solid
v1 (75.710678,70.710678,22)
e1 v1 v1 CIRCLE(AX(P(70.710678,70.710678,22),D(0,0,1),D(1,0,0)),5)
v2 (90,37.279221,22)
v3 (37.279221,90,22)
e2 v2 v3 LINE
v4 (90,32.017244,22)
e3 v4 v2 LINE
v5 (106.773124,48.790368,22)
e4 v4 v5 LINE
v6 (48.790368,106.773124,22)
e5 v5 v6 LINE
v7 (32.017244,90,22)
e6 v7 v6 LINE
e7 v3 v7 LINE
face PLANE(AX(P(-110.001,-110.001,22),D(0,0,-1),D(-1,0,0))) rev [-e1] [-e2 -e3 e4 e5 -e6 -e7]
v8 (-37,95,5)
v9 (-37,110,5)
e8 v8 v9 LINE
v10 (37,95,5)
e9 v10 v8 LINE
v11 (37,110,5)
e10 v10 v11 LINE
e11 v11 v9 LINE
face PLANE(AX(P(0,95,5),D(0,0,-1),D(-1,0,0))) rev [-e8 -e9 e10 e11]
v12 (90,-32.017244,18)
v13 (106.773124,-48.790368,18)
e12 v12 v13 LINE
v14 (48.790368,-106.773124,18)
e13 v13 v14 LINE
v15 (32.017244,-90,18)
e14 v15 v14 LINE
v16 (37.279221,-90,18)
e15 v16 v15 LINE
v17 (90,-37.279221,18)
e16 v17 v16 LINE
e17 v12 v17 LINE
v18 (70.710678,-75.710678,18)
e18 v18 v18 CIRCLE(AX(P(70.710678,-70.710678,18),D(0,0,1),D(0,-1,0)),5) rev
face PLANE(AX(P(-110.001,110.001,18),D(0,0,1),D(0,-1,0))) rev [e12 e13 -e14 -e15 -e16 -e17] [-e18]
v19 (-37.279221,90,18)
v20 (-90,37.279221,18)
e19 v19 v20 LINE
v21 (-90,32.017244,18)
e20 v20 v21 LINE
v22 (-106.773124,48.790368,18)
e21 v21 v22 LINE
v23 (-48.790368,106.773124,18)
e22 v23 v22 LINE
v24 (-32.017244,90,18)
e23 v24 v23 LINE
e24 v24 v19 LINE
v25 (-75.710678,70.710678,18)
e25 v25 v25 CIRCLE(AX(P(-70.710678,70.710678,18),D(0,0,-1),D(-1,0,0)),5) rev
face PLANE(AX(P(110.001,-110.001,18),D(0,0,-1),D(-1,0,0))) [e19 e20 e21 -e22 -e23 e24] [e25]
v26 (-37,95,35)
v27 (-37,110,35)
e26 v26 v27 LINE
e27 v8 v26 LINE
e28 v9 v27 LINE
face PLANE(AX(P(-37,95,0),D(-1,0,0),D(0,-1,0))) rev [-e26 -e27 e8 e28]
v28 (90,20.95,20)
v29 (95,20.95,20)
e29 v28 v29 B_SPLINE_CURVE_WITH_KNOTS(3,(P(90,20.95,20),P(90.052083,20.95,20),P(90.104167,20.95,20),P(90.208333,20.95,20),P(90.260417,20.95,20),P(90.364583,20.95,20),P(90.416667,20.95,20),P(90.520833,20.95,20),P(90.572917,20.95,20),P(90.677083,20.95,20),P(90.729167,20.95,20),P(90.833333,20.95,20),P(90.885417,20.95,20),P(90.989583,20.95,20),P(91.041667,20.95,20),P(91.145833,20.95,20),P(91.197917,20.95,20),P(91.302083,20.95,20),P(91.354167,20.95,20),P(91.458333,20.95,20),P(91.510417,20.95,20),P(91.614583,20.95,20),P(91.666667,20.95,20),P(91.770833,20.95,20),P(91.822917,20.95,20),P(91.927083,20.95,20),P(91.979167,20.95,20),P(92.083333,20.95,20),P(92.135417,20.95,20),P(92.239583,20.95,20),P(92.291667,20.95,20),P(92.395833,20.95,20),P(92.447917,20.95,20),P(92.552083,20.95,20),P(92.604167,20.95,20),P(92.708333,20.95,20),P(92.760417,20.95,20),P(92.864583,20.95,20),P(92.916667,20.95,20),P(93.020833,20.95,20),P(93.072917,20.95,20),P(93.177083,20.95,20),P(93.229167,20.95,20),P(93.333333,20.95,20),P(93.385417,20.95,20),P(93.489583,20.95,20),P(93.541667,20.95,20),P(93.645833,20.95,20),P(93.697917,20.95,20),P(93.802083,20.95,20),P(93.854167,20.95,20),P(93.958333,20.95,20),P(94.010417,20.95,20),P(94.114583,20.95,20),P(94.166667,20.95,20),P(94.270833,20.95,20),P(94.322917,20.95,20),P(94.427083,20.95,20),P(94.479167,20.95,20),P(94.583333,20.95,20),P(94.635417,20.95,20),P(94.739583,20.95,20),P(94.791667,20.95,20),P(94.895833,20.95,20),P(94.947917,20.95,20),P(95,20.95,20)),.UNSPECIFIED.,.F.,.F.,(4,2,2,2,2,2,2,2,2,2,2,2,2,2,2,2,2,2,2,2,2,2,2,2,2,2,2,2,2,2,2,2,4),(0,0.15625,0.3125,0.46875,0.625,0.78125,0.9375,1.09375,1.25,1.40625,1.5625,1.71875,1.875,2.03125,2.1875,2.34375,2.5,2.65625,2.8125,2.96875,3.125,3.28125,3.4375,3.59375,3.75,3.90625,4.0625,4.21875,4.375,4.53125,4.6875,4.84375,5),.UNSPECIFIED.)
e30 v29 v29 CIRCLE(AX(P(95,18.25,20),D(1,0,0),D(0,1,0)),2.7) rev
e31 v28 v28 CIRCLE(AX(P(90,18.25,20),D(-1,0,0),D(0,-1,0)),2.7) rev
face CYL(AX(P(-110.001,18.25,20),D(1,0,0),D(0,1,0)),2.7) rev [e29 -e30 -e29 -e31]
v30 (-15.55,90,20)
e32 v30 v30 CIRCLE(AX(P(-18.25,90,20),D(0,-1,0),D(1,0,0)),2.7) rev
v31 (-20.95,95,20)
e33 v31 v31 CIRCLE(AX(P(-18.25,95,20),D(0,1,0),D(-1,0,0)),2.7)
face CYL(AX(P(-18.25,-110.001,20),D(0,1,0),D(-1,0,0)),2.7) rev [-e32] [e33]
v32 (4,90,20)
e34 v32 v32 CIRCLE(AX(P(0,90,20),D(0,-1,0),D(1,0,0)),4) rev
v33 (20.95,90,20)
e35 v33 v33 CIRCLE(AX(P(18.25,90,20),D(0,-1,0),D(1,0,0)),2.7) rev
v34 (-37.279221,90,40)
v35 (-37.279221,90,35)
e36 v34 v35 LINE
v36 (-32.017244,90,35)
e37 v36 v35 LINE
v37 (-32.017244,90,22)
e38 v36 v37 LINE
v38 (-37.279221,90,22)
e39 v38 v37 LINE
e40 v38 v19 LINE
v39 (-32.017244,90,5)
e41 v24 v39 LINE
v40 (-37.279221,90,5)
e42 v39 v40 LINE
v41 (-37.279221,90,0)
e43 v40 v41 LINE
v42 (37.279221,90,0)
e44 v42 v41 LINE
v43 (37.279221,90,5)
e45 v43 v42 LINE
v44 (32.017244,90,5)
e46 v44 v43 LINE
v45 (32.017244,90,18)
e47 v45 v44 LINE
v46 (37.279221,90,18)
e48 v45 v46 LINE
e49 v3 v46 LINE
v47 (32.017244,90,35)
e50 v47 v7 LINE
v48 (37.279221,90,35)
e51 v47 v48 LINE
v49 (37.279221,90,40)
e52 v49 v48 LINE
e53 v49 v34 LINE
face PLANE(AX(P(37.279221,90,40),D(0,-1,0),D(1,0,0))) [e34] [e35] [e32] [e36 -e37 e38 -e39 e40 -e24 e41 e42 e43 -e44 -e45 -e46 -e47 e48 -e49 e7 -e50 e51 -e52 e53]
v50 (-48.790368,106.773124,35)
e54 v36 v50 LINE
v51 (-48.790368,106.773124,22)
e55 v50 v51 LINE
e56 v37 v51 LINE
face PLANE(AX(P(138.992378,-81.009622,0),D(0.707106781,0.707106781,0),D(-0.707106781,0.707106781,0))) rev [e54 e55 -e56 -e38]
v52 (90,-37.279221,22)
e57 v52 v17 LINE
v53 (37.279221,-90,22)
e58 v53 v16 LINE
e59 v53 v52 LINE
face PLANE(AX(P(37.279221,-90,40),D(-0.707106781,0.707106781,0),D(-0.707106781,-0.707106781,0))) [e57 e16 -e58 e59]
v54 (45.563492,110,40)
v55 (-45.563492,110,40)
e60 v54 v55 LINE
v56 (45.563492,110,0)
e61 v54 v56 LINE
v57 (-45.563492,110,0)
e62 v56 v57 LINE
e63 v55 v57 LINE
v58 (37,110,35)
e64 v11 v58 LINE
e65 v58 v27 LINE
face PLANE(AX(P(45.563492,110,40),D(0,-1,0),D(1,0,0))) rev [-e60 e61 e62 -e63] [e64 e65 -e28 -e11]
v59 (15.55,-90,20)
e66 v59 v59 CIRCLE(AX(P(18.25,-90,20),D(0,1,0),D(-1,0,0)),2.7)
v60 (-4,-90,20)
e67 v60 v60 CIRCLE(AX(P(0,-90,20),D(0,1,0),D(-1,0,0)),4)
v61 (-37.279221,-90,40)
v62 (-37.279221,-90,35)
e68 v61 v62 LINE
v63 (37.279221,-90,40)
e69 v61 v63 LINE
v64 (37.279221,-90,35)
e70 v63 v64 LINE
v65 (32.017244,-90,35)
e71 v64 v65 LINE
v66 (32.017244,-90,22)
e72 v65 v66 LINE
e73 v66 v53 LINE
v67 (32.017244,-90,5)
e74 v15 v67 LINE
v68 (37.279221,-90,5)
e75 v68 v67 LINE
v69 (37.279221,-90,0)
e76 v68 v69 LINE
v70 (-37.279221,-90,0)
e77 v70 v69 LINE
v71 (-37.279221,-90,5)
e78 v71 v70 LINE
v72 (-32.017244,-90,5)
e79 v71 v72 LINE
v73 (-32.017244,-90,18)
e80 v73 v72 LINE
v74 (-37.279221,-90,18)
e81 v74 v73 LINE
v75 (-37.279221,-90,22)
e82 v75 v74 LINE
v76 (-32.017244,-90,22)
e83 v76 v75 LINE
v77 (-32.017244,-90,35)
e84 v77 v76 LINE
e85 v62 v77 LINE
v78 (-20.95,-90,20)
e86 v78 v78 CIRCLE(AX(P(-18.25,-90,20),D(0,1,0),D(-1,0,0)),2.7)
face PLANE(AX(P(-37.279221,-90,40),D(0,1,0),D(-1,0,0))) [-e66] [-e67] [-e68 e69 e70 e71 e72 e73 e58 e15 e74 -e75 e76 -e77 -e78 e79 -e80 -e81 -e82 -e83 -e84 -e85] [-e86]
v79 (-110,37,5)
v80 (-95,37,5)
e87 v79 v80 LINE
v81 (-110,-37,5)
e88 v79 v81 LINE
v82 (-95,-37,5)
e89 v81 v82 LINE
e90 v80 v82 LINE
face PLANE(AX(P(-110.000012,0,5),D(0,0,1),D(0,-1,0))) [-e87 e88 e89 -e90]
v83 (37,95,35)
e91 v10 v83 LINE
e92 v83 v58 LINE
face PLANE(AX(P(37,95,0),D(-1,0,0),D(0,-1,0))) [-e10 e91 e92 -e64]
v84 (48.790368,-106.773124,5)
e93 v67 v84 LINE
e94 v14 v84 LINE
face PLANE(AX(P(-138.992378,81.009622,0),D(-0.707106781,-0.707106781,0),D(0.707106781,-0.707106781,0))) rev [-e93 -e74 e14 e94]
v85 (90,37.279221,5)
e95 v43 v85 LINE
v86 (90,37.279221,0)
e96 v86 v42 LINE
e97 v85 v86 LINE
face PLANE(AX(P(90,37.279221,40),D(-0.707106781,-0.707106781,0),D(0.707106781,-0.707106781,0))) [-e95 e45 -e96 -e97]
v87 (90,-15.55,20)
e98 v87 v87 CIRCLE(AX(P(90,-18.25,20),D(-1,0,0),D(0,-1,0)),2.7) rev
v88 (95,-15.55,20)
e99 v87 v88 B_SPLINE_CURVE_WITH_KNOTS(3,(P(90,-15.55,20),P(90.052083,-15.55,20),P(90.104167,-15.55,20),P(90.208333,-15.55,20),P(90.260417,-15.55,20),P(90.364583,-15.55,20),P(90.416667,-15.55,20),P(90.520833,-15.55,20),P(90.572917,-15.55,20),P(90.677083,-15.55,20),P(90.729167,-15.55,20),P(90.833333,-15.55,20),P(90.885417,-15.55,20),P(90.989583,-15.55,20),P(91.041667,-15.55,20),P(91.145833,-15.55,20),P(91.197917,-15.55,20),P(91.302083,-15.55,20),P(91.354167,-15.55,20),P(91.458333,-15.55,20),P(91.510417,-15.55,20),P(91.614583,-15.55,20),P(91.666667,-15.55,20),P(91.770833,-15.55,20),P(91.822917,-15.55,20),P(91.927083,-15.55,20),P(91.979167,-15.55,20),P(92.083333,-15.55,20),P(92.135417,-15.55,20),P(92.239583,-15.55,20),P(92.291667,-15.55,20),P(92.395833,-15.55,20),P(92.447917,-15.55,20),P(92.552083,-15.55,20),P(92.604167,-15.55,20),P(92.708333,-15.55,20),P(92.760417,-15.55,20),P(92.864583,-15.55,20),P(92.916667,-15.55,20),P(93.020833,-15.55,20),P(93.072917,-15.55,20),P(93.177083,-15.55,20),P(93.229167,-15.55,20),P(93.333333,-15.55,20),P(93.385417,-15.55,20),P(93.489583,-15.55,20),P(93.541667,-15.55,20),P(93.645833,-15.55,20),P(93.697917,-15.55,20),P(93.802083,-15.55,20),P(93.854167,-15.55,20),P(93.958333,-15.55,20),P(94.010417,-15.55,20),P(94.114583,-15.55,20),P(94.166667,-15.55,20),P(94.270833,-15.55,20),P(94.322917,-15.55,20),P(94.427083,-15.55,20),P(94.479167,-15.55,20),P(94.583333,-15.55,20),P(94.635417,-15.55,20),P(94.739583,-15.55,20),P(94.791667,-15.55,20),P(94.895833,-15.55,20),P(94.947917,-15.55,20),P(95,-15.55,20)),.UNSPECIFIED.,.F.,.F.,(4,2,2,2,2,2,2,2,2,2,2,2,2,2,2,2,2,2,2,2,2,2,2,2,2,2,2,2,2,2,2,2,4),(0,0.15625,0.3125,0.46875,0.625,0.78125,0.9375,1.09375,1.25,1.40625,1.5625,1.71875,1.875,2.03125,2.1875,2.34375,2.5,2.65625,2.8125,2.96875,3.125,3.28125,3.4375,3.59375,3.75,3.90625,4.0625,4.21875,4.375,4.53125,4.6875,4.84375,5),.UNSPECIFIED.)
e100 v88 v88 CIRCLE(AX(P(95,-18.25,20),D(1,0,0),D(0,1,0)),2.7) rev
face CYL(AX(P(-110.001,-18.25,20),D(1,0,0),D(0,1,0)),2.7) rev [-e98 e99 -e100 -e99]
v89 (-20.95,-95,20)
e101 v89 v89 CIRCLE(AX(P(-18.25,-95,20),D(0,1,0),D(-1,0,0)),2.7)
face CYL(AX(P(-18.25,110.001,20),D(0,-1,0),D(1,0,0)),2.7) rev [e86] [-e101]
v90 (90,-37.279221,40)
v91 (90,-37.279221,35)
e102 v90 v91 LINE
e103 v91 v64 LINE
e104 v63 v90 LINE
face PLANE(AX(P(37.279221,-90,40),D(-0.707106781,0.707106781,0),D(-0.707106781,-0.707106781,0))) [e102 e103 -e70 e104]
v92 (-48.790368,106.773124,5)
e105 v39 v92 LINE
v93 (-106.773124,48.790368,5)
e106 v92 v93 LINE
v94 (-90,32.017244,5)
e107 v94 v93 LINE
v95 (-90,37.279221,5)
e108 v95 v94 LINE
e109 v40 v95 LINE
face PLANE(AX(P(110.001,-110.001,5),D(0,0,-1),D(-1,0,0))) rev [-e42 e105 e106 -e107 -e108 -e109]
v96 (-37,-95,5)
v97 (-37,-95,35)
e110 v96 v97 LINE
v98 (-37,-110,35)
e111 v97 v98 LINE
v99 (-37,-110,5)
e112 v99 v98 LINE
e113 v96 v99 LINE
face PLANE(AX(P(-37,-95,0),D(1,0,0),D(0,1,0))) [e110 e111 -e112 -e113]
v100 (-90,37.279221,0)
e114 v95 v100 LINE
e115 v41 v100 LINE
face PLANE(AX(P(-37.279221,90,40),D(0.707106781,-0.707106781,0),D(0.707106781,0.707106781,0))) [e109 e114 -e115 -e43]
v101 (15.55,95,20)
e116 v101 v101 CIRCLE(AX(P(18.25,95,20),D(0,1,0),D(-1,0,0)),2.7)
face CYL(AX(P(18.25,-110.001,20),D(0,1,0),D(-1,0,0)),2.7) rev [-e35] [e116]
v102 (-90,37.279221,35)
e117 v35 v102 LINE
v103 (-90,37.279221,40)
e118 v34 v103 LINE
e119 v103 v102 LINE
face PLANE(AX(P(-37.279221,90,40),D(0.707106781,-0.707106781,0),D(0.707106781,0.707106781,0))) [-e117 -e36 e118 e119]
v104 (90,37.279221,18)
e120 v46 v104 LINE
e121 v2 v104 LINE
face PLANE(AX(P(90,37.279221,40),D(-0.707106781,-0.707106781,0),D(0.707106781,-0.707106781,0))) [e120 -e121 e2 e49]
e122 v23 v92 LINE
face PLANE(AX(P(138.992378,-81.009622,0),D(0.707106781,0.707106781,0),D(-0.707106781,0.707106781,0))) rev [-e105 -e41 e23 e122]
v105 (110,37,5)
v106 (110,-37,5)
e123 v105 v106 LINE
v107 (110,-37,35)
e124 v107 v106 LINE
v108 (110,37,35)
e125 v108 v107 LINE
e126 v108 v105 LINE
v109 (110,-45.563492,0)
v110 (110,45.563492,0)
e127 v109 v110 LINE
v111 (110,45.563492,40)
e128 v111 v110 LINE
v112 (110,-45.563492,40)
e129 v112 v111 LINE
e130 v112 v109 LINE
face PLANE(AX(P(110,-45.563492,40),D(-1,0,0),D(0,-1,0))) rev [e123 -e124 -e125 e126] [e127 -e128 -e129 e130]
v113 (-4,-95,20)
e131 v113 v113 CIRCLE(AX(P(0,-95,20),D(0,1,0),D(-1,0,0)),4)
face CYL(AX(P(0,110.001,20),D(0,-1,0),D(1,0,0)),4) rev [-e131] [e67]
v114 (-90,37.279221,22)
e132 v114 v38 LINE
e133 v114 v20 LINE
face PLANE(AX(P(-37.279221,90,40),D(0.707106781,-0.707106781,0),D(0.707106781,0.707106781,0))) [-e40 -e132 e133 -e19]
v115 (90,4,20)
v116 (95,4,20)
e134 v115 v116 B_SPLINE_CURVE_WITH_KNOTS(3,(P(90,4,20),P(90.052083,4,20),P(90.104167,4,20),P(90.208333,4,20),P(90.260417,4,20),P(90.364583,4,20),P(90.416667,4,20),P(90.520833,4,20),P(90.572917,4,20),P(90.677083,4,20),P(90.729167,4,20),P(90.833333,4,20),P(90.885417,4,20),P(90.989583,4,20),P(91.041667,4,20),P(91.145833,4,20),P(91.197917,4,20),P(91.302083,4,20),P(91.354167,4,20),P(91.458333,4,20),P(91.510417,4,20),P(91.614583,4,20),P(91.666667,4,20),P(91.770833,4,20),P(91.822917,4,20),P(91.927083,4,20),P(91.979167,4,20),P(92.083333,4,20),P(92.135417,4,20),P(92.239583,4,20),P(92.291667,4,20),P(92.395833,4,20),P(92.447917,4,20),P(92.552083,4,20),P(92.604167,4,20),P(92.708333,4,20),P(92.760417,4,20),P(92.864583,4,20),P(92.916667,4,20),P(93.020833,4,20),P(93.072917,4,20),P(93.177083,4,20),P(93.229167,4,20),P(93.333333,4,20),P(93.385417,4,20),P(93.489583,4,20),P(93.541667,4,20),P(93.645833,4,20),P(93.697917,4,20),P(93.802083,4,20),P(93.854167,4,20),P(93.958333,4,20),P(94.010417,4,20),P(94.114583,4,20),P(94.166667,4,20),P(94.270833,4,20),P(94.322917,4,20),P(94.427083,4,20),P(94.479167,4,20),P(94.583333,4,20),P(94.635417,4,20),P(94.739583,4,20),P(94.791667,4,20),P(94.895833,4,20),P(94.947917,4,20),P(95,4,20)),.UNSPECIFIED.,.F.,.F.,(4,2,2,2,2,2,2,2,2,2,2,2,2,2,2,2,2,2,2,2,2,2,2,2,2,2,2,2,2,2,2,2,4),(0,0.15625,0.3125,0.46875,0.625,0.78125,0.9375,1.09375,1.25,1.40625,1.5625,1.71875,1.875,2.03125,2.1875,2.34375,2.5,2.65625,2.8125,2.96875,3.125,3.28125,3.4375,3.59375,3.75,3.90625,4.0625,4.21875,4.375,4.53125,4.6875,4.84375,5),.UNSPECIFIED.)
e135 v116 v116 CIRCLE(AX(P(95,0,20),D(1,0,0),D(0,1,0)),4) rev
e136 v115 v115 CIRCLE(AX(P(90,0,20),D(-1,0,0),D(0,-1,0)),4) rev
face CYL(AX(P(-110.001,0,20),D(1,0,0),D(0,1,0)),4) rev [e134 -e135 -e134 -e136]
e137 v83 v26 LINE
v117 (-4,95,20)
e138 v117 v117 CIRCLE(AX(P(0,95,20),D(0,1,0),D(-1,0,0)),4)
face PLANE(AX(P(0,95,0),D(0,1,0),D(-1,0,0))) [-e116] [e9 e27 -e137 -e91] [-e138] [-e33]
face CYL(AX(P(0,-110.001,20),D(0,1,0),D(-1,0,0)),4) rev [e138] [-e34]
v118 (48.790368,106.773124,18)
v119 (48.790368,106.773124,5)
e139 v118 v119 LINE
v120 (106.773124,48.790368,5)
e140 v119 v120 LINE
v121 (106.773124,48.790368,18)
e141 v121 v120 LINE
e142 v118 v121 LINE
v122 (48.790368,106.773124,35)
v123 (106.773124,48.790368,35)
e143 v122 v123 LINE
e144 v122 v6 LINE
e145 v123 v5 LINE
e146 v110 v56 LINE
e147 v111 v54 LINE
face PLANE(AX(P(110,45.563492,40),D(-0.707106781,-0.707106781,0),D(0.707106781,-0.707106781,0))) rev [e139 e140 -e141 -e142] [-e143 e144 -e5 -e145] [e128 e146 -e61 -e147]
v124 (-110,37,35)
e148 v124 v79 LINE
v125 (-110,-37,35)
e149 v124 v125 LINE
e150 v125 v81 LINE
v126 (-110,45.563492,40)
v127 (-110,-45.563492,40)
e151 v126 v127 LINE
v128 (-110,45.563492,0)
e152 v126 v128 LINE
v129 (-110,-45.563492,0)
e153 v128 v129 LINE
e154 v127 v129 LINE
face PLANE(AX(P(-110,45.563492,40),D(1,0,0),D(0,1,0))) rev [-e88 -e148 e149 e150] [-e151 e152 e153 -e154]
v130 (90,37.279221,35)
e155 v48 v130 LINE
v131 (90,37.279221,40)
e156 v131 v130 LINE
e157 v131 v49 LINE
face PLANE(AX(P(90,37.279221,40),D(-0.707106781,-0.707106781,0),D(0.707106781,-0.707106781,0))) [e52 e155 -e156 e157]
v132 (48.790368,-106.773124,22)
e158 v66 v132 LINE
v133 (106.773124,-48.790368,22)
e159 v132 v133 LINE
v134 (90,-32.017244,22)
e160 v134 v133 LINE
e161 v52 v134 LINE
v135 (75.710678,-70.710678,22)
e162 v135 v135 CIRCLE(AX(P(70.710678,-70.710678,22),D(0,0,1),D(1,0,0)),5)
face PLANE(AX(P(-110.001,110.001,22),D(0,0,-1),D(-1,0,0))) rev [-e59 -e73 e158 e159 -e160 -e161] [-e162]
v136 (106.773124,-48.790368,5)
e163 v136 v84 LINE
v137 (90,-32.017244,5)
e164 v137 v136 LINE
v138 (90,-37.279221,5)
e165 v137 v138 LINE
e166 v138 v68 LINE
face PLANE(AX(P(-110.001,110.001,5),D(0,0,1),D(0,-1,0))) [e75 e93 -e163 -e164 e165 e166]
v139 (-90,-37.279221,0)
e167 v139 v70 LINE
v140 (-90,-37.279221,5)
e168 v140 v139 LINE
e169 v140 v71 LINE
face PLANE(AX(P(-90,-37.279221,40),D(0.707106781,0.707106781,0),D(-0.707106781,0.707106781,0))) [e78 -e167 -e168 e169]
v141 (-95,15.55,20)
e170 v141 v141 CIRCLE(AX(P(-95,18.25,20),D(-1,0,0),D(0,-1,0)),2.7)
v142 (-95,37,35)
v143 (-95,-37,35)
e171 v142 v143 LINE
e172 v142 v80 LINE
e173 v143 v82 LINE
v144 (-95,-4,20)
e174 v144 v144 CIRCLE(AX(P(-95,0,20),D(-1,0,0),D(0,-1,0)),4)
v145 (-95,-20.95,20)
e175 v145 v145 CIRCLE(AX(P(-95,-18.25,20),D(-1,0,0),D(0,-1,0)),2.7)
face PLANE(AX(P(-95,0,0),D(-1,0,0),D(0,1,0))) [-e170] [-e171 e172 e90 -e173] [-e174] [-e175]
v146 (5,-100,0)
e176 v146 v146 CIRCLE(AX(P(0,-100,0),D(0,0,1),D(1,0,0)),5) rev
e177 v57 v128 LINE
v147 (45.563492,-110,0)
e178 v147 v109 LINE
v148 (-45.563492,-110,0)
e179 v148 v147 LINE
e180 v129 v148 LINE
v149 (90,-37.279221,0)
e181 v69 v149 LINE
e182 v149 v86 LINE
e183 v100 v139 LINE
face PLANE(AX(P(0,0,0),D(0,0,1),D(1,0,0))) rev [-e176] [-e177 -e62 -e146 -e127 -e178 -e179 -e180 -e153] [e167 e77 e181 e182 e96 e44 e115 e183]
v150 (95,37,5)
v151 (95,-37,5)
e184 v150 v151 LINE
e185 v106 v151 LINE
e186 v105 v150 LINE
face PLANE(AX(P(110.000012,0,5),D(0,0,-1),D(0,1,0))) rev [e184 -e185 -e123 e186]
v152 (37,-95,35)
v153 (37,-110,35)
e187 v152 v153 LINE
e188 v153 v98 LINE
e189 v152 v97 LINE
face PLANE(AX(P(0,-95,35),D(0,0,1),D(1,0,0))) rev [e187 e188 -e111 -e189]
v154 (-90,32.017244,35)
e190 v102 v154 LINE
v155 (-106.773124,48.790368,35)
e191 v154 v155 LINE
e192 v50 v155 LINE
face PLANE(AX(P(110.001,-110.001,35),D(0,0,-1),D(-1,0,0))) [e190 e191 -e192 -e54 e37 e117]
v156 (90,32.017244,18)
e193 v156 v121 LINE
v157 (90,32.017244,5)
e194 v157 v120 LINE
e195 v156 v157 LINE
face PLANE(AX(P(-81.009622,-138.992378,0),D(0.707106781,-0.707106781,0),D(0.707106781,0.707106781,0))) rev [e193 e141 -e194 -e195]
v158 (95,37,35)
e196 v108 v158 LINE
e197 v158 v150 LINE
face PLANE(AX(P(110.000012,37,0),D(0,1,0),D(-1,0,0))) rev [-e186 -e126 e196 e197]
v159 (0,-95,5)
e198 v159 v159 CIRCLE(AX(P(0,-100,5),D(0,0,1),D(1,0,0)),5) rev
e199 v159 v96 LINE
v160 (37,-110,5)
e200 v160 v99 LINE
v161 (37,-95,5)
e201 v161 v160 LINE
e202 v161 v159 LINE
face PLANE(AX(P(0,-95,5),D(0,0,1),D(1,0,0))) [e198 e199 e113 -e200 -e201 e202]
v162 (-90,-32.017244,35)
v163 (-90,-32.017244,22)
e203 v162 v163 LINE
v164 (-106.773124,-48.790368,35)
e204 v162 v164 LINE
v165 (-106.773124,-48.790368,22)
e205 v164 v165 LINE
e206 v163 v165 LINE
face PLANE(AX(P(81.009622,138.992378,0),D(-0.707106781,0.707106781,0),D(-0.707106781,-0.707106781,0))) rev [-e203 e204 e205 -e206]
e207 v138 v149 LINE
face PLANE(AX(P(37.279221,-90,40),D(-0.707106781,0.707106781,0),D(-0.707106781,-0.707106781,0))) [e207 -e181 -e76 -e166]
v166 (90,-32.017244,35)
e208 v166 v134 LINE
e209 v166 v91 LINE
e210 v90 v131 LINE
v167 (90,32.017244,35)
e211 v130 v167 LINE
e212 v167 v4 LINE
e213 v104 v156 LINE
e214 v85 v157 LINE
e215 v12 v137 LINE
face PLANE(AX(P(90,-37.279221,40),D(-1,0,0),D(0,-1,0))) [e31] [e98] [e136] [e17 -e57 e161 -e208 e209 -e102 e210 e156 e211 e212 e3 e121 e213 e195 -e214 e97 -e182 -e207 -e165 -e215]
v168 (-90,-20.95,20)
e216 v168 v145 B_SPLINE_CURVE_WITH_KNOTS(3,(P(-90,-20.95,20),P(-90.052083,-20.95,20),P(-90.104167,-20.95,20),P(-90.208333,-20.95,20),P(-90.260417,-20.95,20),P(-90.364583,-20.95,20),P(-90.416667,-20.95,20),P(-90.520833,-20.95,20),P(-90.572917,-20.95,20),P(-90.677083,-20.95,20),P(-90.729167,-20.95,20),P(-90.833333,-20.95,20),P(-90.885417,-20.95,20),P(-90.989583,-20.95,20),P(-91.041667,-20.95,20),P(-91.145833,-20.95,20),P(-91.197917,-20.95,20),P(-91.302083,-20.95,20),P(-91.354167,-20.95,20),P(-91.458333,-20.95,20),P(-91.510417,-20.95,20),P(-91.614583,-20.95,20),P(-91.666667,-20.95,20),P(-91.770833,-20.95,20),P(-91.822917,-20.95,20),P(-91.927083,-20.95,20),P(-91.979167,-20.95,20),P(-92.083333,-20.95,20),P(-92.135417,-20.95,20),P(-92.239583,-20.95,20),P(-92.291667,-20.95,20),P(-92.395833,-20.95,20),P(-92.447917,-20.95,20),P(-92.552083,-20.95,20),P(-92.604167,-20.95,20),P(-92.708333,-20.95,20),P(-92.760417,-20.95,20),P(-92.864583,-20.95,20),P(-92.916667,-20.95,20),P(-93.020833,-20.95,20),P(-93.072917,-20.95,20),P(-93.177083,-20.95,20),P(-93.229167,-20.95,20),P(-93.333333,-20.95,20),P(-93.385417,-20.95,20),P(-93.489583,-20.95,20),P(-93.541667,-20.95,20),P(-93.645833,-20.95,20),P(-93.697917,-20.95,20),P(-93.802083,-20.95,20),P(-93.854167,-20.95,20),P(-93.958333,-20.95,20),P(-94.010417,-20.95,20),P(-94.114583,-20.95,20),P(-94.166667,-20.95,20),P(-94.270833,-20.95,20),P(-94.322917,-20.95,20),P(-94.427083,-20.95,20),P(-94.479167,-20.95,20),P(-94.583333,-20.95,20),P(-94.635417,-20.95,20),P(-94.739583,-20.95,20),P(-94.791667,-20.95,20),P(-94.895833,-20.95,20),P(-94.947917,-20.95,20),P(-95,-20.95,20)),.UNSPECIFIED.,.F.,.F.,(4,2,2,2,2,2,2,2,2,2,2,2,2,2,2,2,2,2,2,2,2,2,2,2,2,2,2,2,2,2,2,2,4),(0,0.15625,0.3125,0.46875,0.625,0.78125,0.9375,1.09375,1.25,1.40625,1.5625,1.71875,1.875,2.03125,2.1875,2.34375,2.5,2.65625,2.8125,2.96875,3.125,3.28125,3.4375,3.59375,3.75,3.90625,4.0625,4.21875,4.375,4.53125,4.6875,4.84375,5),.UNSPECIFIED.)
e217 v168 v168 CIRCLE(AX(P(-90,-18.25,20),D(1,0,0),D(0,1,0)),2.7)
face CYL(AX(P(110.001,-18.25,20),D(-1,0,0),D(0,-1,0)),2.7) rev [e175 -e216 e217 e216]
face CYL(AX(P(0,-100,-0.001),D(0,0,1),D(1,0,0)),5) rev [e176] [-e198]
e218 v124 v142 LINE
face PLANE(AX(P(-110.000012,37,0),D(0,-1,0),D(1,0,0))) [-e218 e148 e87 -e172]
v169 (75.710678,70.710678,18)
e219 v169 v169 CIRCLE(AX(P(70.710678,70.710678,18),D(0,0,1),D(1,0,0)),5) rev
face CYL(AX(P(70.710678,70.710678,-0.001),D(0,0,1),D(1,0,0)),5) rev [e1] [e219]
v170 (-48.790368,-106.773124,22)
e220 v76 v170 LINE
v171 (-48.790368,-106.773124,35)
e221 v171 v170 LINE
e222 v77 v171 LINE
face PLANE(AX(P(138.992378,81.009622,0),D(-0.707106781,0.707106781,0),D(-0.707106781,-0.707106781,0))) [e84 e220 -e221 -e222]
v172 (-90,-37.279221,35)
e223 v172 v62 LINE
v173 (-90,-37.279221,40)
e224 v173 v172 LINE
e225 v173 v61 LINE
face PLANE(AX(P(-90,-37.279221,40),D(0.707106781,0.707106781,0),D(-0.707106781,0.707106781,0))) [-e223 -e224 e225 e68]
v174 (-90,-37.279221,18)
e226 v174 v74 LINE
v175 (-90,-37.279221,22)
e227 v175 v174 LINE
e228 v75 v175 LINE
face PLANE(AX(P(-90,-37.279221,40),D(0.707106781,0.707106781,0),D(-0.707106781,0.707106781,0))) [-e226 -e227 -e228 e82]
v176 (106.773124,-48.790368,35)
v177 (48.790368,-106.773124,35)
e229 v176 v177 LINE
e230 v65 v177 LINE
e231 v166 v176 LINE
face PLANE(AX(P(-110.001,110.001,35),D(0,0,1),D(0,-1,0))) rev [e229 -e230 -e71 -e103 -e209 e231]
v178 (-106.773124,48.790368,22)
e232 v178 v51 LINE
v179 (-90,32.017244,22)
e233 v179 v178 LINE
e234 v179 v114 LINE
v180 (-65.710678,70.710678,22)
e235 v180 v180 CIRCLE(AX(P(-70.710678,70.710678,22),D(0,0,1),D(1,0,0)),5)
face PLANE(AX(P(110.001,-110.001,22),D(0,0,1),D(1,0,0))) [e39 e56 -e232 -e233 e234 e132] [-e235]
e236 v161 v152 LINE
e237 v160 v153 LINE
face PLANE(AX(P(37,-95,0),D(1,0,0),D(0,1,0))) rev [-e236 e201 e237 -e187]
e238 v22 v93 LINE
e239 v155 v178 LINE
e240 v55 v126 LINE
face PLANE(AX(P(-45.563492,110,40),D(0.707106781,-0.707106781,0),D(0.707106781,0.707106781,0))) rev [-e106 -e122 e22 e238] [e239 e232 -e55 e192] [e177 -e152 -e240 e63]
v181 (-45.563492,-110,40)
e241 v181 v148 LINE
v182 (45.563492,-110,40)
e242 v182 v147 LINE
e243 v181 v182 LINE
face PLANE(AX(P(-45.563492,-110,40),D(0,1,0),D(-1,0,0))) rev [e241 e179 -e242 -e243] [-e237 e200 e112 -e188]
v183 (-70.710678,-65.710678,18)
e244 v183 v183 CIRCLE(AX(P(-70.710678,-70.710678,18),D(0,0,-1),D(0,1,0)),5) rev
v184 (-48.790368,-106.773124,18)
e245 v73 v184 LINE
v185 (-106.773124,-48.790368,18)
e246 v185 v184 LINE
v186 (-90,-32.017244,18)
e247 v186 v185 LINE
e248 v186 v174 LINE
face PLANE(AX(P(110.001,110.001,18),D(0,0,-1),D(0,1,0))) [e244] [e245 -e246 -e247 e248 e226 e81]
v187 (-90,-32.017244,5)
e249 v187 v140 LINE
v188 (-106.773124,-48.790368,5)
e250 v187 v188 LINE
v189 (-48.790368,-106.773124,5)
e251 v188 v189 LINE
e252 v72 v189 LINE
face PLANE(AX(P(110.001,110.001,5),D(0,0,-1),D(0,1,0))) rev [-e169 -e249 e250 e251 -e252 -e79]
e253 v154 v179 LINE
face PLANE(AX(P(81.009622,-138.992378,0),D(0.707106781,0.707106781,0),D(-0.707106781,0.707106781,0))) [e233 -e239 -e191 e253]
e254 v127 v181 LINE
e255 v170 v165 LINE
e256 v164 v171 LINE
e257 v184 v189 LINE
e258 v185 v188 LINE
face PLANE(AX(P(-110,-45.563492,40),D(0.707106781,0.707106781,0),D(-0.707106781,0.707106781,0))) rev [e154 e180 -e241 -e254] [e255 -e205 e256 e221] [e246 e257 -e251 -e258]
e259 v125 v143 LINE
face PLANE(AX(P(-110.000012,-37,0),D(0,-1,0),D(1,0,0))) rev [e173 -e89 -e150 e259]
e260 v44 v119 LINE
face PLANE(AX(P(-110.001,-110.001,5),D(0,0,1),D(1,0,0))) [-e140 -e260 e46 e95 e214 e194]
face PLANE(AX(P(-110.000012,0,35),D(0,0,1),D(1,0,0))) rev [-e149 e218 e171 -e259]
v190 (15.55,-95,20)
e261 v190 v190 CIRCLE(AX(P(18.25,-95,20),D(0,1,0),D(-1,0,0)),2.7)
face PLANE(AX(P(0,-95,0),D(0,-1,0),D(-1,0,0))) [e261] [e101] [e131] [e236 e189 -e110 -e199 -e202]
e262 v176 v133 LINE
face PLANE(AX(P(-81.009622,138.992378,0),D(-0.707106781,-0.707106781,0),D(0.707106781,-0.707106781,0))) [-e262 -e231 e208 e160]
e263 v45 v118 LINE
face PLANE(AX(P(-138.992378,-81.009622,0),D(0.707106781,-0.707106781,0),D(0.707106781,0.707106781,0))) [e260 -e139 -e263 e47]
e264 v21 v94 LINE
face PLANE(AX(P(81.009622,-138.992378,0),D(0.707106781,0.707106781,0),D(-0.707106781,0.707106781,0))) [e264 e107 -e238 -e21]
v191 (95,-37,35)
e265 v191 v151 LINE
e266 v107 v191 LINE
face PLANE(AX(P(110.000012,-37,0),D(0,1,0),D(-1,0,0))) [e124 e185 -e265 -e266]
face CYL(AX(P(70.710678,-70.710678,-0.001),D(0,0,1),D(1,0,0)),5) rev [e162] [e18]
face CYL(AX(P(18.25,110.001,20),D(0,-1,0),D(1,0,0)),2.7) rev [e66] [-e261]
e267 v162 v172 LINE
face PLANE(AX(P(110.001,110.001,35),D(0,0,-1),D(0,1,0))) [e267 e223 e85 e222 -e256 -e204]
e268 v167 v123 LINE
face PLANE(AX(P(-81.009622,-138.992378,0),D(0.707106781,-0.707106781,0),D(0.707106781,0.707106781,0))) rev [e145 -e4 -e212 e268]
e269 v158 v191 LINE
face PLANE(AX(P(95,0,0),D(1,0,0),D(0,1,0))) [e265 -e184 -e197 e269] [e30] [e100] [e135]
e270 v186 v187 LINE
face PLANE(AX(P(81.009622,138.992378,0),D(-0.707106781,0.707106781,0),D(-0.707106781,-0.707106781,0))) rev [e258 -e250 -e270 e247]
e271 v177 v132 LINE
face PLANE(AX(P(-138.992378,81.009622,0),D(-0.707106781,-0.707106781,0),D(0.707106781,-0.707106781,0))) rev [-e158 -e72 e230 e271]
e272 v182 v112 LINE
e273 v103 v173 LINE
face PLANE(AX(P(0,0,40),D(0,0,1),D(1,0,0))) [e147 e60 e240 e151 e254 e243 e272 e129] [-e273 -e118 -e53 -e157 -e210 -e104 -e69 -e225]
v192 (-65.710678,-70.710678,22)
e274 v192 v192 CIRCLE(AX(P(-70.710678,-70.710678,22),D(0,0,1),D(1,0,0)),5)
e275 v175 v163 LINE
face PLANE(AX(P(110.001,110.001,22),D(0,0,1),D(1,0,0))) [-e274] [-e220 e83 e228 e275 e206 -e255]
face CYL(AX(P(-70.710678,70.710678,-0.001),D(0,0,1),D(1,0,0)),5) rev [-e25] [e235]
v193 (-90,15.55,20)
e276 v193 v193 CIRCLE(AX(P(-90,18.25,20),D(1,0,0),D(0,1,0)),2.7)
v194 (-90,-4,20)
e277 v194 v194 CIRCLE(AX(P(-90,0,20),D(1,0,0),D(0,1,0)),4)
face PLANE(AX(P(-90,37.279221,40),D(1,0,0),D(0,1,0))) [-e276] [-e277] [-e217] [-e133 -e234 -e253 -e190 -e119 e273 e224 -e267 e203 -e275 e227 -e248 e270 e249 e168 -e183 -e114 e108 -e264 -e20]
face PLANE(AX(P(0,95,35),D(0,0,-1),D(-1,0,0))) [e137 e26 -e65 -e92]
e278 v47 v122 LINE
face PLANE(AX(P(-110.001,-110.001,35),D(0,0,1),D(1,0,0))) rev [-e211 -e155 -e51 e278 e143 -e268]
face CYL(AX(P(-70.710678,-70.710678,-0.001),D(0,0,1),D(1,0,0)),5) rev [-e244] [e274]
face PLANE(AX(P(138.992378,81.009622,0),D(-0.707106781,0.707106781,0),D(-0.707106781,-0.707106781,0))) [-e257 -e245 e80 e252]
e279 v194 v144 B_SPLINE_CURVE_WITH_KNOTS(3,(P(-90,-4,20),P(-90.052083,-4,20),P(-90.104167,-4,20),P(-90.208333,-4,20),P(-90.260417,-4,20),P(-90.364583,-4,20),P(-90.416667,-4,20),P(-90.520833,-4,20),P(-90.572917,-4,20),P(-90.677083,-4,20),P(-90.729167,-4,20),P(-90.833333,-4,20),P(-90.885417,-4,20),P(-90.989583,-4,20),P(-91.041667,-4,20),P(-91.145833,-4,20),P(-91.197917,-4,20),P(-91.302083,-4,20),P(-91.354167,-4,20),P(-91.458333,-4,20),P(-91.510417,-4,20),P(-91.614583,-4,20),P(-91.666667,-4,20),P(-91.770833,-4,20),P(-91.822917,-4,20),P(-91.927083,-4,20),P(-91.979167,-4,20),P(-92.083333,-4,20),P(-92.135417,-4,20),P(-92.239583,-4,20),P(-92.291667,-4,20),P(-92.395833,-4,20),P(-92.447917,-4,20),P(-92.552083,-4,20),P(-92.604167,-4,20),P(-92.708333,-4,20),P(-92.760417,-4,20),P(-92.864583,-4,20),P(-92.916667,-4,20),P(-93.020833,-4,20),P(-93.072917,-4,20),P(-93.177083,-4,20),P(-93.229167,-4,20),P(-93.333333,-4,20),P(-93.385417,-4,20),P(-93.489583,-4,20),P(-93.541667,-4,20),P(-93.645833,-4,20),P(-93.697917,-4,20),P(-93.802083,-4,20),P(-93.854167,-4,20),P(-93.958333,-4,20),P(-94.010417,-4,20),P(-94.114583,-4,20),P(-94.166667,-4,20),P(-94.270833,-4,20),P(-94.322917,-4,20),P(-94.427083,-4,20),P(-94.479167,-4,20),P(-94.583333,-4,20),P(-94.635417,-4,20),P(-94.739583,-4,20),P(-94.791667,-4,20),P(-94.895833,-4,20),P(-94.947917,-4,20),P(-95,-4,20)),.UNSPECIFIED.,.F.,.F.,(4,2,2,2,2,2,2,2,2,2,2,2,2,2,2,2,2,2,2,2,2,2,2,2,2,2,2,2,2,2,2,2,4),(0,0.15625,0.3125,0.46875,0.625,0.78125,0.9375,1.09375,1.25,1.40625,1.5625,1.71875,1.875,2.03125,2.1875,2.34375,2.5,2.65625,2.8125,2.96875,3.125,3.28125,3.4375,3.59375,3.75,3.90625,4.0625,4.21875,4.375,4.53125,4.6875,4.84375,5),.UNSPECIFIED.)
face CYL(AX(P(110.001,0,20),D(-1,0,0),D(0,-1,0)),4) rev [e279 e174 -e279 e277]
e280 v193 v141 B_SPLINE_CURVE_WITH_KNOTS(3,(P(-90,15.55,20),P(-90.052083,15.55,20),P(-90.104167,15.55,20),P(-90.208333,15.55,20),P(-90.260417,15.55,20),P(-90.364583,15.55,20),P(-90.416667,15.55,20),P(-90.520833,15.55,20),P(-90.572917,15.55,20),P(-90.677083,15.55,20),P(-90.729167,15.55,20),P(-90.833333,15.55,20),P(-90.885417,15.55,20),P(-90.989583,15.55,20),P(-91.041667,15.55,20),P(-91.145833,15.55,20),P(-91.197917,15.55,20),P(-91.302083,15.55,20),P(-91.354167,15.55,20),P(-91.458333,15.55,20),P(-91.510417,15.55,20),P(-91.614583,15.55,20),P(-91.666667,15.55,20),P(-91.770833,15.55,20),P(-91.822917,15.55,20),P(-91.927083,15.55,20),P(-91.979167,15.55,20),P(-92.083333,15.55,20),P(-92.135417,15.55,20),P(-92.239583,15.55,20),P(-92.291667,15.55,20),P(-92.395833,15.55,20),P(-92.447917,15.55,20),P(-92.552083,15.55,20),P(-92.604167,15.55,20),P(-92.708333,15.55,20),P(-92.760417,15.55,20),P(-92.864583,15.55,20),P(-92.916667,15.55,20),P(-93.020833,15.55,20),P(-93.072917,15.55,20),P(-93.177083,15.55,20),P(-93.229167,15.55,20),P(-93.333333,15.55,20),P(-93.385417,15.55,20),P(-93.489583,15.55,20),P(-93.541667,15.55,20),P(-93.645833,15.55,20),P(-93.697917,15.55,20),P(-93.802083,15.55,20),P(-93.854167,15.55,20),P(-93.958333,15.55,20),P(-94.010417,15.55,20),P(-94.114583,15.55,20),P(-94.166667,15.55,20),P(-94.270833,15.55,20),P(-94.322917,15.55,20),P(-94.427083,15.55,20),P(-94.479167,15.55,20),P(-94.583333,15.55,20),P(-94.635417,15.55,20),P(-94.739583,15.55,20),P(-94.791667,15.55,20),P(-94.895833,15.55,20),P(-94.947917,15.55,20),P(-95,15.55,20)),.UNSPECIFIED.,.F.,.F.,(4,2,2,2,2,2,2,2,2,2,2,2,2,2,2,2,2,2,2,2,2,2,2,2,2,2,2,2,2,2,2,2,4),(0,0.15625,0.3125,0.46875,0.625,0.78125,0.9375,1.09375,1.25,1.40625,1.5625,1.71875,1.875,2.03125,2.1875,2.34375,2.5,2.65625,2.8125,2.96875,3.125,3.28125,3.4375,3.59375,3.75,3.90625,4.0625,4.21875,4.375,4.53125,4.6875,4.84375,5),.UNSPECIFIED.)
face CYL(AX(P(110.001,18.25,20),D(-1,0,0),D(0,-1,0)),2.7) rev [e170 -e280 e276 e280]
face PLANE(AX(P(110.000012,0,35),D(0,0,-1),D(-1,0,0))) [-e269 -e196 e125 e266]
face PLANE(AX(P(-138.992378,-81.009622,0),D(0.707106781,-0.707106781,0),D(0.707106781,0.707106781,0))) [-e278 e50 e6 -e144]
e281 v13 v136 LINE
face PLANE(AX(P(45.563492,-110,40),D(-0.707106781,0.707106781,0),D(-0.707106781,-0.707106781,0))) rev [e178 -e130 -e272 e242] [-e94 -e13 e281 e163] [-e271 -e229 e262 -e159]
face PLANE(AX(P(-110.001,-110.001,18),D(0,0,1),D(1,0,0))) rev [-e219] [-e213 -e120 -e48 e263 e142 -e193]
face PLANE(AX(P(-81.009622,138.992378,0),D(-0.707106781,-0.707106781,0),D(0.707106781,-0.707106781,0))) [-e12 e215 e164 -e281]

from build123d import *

# Parameters (mm, degrees)
RESSALTO_EXTRUS_O1_DEPTH = 40
CORTE_EXTRUS_O1_START    = -15
ESBO_O2_W                = 30
ESBO_O2_H                = 74
ESBO_O2_R                = 2.7
ESBO_O2_R_2              = 4
CORTE_EXTRUS_O1_DEPTH    = 265.198715888
CORTE_EXTRUS_O6_REACH    = 251.199
ESBO_O2_3_R              = 4
ESBO_O2_3_R_2            = 2.7
CORTE_EXTRUS_O2_REACH    = 251.199
ESBO_O3_R                = 4
ESBO_O3_R_2              = 2.7
ESBO_O3_3_W              = 74
ESBO_O3_3_H              = 30
ESBO_O3_3_R              = 2.7
ESBO_O3_3_R_2            = 4
CORTE_EXTRUS_O7_DEPTH    = 15
CORTE_EXTRUS_O3_REACH    = 270.559
ESBO_O4_W                = 13
ESBO_O4_H                = 82
CORTE_EXTRUS_O8_REACH    = 270.559
ESBO_O9_W                = 13
ESBO_O9_H                = 82
CORTE_EXTRUS_O9_REACH    = 180.624
CORTE_EXTRUS_O9_START    = -18
ESBO_O10_R               = 5


with BuildPart() as part:
    # Esboço1 → Ressalto-extrusão1 (new body)
    with BuildSketch(Plane.XY):
        Polygon((110, 45.563491861), (45.563491861, 110), (-45.563491861, 110), (-110, 45.563491861), (-110, -45.563491861), (-45.563491861, -110), (45.563491861, -110), (110, -45.563491861), align=None)
        Polygon((90, 37.279220614), (37.279220614, 90), (-37.279220614, 90), (-90, 37.279220614), (-90, -37.279220614), (-37.279220614, -90), (37.279220614, -90), (90, -37.279220614), align=None, mode=Mode.SUBTRACT)
    extrude(amount=RESSALTO_EXTRUS_O1_DEPTH)

    # Esboço2 → Corte-extrusão1 (cut)
    with BuildSketch(Plane(origin=(110, 0, 0), x_dir=(0, 0, -1), z_dir=(1, 0, 0)).offset(CORTE_EXTRUS_O1_START)):
        with Locations((-20, 0)):
            Rectangle(ESBO_O2_W, ESBO_O2_H)
        with Locations((-20, -18.25)):
            Circle(ESBO_O2_R, mode=Mode.SUBTRACT)
        with Locations((-20, 0)):
            Circle(ESBO_O2_R_2, mode=Mode.SUBTRACT)
        with Locations((-20, 18.25)):
            Circle(ESBO_O2_R, mode=Mode.SUBTRACT)
    corte_extrus_o1 = extrude(amount=CORTE_EXTRUS_O1_DEPTH, mode=Mode.SUBTRACT)

    # Esboço2<3> → Corte-extrusão6 (cut, up to next)
    with BuildSketch(Plane(origin=(110, 0, 0), x_dir=(0, 0, -1), z_dir=(1, 0, 0)), mode=Mode.PRIVATE) as corte_extrus_o6_sk1:
        with Locations((-20, 0)):
            Circle(ESBO_O2_3_R)
    corte_extrus_o6_tool1 = extrude(corte_extrus_o6_sk1.sketch, amount=-CORTE_EXTRUS_O6_REACH, mode=Mode.PRIVATE) & part.part
    # Esboço2<3> → Corte-extrusão6 (cut, up to next)
    with BuildSketch(Plane(origin=(110, 0, 0), x_dir=(0, 0, -1), z_dir=(1, 0, 0)), mode=Mode.PRIVATE) as corte_extrus_o6_sk2:
        with Locations((-20, 18.25)):
            Circle(ESBO_O2_3_R_2)
    corte_extrus_o6_tool2 = extrude(corte_extrus_o6_sk2.sketch, amount=-CORTE_EXTRUS_O6_REACH, mode=Mode.PRIVATE) & part.part
    # Esboço2<3> → Corte-extrusão6 (cut, up to next)
    with BuildSketch(Plane(origin=(110, 0, 0), x_dir=(0, 0, -1), z_dir=(1, 0, 0)), mode=Mode.PRIVATE) as corte_extrus_o6_sk3:
        with Locations((-20, -18.25)):
            Circle(ESBO_O2_3_R_2)
    corte_extrus_o6_tool3 = extrude(corte_extrus_o6_sk3.sketch, amount=-CORTE_EXTRUS_O6_REACH, mode=Mode.PRIVATE) & part.part
    corte_extrus_o6_1 = corte_extrus_o6_tool1.solids().sort_by_distance((110, 0, 20))[0]
    add(corte_extrus_o6_1, mode=Mode.SUBTRACT)
    corte_extrus_o6_2 = corte_extrus_o6_tool2.solids().sort_by_distance((110, 18.25, 20))[0]
    add(corte_extrus_o6_2, mode=Mode.SUBTRACT)
    corte_extrus_o6_3 = corte_extrus_o6_tool3.solids().sort_by_distance((110, -18.25, 20))[0]
    add(corte_extrus_o6_3, mode=Mode.SUBTRACT)
    corte_extrus_o6 = corte_extrus_o6_1 + corte_extrus_o6_2 + corte_extrus_o6_3  # Corte-extrusão6 as one shape, for the pattern or mirror that repeats it

    # Esboço3 → Corte-extrusão2 (cut, up to next)
    with BuildSketch(Plane(origin=(0, 110, 0), x_dir=(1, 0, 0), z_dir=(0, 1, 0)), mode=Mode.PRIVATE) as corte_extrus_o2_sk1:
        with Locations((0, -20)):
            Circle(ESBO_O3_R)
    corte_extrus_o2_tool1 = extrude(corte_extrus_o2_sk1.sketch, amount=-CORTE_EXTRUS_O2_REACH, mode=Mode.PRIVATE) & part.part
    # Esboço3 → Corte-extrusão2 (cut, up to next)
    with BuildSketch(Plane(origin=(0, 110, 0), x_dir=(1, 0, 0), z_dir=(0, 1, 0)), mode=Mode.PRIVATE) as corte_extrus_o2_sk2:
        with Locations((18.25, -20)):
            Circle(ESBO_O3_R_2)
    corte_extrus_o2_tool2 = extrude(corte_extrus_o2_sk2.sketch, amount=-CORTE_EXTRUS_O2_REACH, mode=Mode.PRIVATE) & part.part
    # Esboço3 → Corte-extrusão2 (cut, up to next)
    with BuildSketch(Plane(origin=(0, 110, 0), x_dir=(1, 0, 0), z_dir=(0, 1, 0)), mode=Mode.PRIVATE) as corte_extrus_o2_sk3:
        with Locations((-18.25, -20)):
            Circle(ESBO_O3_R_2)
    corte_extrus_o2_tool3 = extrude(corte_extrus_o2_sk3.sketch, amount=-CORTE_EXTRUS_O2_REACH, mode=Mode.PRIVATE) & part.part
    corte_extrus_o2_1 = corte_extrus_o2_tool1.solids().sort_by_distance((0, 110, 20))[0]
    add(corte_extrus_o2_1, mode=Mode.SUBTRACT)
    corte_extrus_o2_2 = corte_extrus_o2_tool2.solids().sort_by_distance((18.25, 110, 20))[0]
    add(corte_extrus_o2_2, mode=Mode.SUBTRACT)
    corte_extrus_o2_3 = corte_extrus_o2_tool3.solids().sort_by_distance((-18.25, 110, 20))[0]
    add(corte_extrus_o2_3, mode=Mode.SUBTRACT)
    corte_extrus_o2 = corte_extrus_o2_1 + corte_extrus_o2_2 + corte_extrus_o2_3  # Corte-extrusão2 as one shape, for the pattern or mirror that repeats it

    # Espelhar1: Corte-extrusão1, Corte-extrusão6 across plane
    add(corte_extrus_o1.mirror(Plane(origin=(0, 0, 0), x_dir=(0, 0, 1), z_dir=(1, 0, 0))), mode=Mode.SUBTRACT)
    add(corte_extrus_o6.mirror(Plane(origin=(0, 0, 0), x_dir=(0, 0, 1), z_dir=(1, 0, 0))), mode=Mode.SUBTRACT)

    # Esboço3<3> → Corte-extrusão7 (cut)
    with BuildSketch(Plane(origin=(0, 110, 0), x_dir=(1, 0, 0), z_dir=(0, 1, 0))):
        with Locations((0, -20)):
            Rectangle(ESBO_O3_3_W, ESBO_O3_3_H)
        with Locations((-18.25, -20)):
            Circle(ESBO_O3_3_R, mode=Mode.SUBTRACT)
        with Locations((0, -20)):
            Circle(ESBO_O3_3_R_2, mode=Mode.SUBTRACT)
        with Locations((18.25, -20)):
            Circle(ESBO_O3_3_R, mode=Mode.SUBTRACT)
    corte_extrus_o7 = extrude(amount=-CORTE_EXTRUS_O7_DEPTH, mode=Mode.SUBTRACT)

    # Espelhar2: Corte-extrusão2, Corte-extrusão7 across plane
    add(corte_extrus_o2.mirror(Plane.ZX), mode=Mode.SUBTRACT)
    add(corte_extrus_o7.mirror(Plane.ZX), mode=Mode.SUBTRACT)

    # Esboço4 → Corte-extrusão3 (cut, up to next)
    with BuildSketch(Plane(origin=(77.781745931, 77.781745931, 0), x_dir=(0, 0, -1), z_dir=(0.707106781186547, 0.7071067811865481, 0)), mode=Mode.PRIVATE) as corte_extrus_o3_sk1:
        with Locations((-28.5, 0)):
            Rectangle(ESBO_O4_W, ESBO_O4_H)
    corte_extrus_o3_tool1 = extrude(corte_extrus_o3_sk1.sketch, amount=-CORTE_EXTRUS_O3_REACH, mode=Mode.PRIVATE) & part.part
    # Esboço4 → Corte-extrusão3 (cut, up to next)
    with BuildSketch(Plane(origin=(77.781745931, 77.781745931, 0), x_dir=(0, 0, -1), z_dir=(0.707106781186547, 0.7071067811865481, 0)), mode=Mode.PRIVATE) as corte_extrus_o3_sk2:
        with Locations((-11.5, 0)):
            Rectangle(ESBO_O4_W, ESBO_O4_H)
    corte_extrus_o3_tool2 = extrude(corte_extrus_o3_sk2.sketch, amount=-CORTE_EXTRUS_O3_REACH, mode=Mode.PRIVATE) & part.part
    corte_extrus_o3_1 = corte_extrus_o3_tool1.solids().sort_by_distance((77.781746, 77.781746, 28.5))[0]
    add(corte_extrus_o3_1, mode=Mode.SUBTRACT)
    corte_extrus_o3_2 = corte_extrus_o3_tool2.solids().sort_by_distance((77.781746, 77.781746, 11.5))[0]
    add(corte_extrus_o3_2, mode=Mode.SUBTRACT)
    corte_extrus_o3 = corte_extrus_o3_1 + corte_extrus_o3_2  # Corte-extrusão3 as one shape, for the pattern or mirror that repeats it

    # Espelhar3: Corte-extrusão3 across plane
    add(corte_extrus_o3.mirror(Plane(origin=(0, 0, 0), x_dir=(0, 0, 1), z_dir=(0.7071067811865475, 0.7071067811865477, 0))), mode=Mode.SUBTRACT)

    # Esboço9 → Corte-extrusão8 (cut, up to next)
    with BuildSketch(Plane(origin=(77.781745931, -77.781745931, 0), x_dir=(0, 0, -1), z_dir=(0.7071067811865479, -0.7071067811865471, 0)), mode=Mode.PRIVATE) as corte_extrus_o8_sk1:
        with Locations((-28.5, 0)):
            Rectangle(ESBO_O9_W, ESBO_O9_H)
    corte_extrus_o8_tool1 = extrude(corte_extrus_o8_sk1.sketch, amount=-CORTE_EXTRUS_O8_REACH, mode=Mode.PRIVATE) & part.part
    # Esboço9 → Corte-extrusão8 (cut, up to next)
    with BuildSketch(Plane(origin=(77.781745931, -77.781745931, 0), x_dir=(0, 0, -1), z_dir=(0.7071067811865479, -0.7071067811865471, 0)), mode=Mode.PRIVATE) as corte_extrus_o8_sk2:
        with Locations((-11.5, 0)):
            Rectangle(ESBO_O9_W, ESBO_O9_H)
    corte_extrus_o8_tool2 = extrude(corte_extrus_o8_sk2.sketch, amount=-CORTE_EXTRUS_O8_REACH, mode=Mode.PRIVATE) & part.part
    corte_extrus_o8_1 = corte_extrus_o8_tool1.solids().sort_by_distance((77.781746, -77.781746, 28.5))[0]
    add(corte_extrus_o8_1, mode=Mode.SUBTRACT)
    corte_extrus_o8_2 = corte_extrus_o8_tool2.solids().sort_by_distance((77.781746, -77.781746, 11.5))[0]
    add(corte_extrus_o8_2, mode=Mode.SUBTRACT)
    corte_extrus_o8 = corte_extrus_o8_1 + corte_extrus_o8_2  # Corte-extrusão8 as one shape, for the pattern or mirror that repeats it

    # Espelhar4: Corte-extrusão8 across plane
    add(corte_extrus_o8.mirror(Plane(origin=(0, 0, 0), x_dir=(0, 0, 1), z_dir=(0.7071067811865475, -0.7071067811865477, 0))), mode=Mode.SUBTRACT)

    # Esboço10 → Corte-extrusão9 (cut, up to next)
    with BuildSketch(Plane.XY.offset(40).offset(CORTE_EXTRUS_O9_START), mode=Mode.PRIVATE) as corte_extrus_o9_sk1:
        with Locations((0, -100)):
            Circle(ESBO_O10_R)
    corte_extrus_o9_tool1 = extrude(corte_extrus_o9_sk1.sketch, amount=-CORTE_EXTRUS_O9_REACH, mode=Mode.PRIVATE) & part.part
    # Esboço10 → Corte-extrusão9 (cut, up to next)
    with BuildSketch(Plane.XY.offset(40).offset(CORTE_EXTRUS_O9_START), mode=Mode.PRIVATE) as corte_extrus_o9_sk2:
        with Locations((-70.710678119, -70.710678119)):
            Circle(ESBO_O10_R)
    corte_extrus_o9_tool2 = extrude(corte_extrus_o9_sk2.sketch, amount=-CORTE_EXTRUS_O9_REACH, mode=Mode.PRIVATE) & part.part
    # Esboço10 → Corte-extrusão9 (cut, up to next)
    with BuildSketch(Plane.XY.offset(40).offset(CORTE_EXTRUS_O9_START), mode=Mode.PRIVATE) as corte_extrus_o9_sk3:
        with Locations((-70.710678119, 70.710678119)):
            Circle(ESBO_O10_R)
    corte_extrus_o9_tool3 = extrude(corte_extrus_o9_sk3.sketch, amount=-CORTE_EXTRUS_O9_REACH, mode=Mode.PRIVATE) & part.part
    # Esboço10 → Corte-extrusão9 (cut, up to next)
    with BuildSketch(Plane.XY.offset(40).offset(CORTE_EXTRUS_O9_START), mode=Mode.PRIVATE) as corte_extrus_o9_sk4:
        with Locations((70.710678119, 70.710678119)):
            Circle(ESBO_O10_R)
    corte_extrus_o9_tool4 = extrude(corte_extrus_o9_sk4.sketch, amount=-CORTE_EXTRUS_O9_REACH, mode=Mode.PRIVATE) & part.part
    # Esboço10 → Corte-extrusão9 (cut, up to next)
    with BuildSketch(Plane.XY.offset(40).offset(CORTE_EXTRUS_O9_START), mode=Mode.PRIVATE) as corte_extrus_o9_sk5:
        with Locations((70.710678119, -70.710678119)):
            Circle(ESBO_O10_R)
    corte_extrus_o9_tool5 = extrude(corte_extrus_o9_sk5.sketch, amount=-CORTE_EXTRUS_O9_REACH, mode=Mode.PRIVATE) & part.part
    add(corte_extrus_o9_tool1.solids().sort_by_distance((0, -100, 22))[0], mode=Mode.SUBTRACT)
    add(corte_extrus_o9_tool2.solids().sort_by_distance((-70.710678, -70.710678, 22))[0], mode=Mode.SUBTRACT)
    add(corte_extrus_o9_tool3.solids().sort_by_distance((-70.710678, 70.710678, 22))[0], mode=Mode.SUBTRACT)
    add(corte_extrus_o9_tool4.solids().sort_by_distance((70.710678, 70.710678, 22))[0], mode=Mode.SUBTRACT)
    add(corte_extrus_o9_tool5.solids().sort_by_distance((70.710678, -70.710678, 22))[0], mode=Mode.SUBTRACT)


solid = part.part
